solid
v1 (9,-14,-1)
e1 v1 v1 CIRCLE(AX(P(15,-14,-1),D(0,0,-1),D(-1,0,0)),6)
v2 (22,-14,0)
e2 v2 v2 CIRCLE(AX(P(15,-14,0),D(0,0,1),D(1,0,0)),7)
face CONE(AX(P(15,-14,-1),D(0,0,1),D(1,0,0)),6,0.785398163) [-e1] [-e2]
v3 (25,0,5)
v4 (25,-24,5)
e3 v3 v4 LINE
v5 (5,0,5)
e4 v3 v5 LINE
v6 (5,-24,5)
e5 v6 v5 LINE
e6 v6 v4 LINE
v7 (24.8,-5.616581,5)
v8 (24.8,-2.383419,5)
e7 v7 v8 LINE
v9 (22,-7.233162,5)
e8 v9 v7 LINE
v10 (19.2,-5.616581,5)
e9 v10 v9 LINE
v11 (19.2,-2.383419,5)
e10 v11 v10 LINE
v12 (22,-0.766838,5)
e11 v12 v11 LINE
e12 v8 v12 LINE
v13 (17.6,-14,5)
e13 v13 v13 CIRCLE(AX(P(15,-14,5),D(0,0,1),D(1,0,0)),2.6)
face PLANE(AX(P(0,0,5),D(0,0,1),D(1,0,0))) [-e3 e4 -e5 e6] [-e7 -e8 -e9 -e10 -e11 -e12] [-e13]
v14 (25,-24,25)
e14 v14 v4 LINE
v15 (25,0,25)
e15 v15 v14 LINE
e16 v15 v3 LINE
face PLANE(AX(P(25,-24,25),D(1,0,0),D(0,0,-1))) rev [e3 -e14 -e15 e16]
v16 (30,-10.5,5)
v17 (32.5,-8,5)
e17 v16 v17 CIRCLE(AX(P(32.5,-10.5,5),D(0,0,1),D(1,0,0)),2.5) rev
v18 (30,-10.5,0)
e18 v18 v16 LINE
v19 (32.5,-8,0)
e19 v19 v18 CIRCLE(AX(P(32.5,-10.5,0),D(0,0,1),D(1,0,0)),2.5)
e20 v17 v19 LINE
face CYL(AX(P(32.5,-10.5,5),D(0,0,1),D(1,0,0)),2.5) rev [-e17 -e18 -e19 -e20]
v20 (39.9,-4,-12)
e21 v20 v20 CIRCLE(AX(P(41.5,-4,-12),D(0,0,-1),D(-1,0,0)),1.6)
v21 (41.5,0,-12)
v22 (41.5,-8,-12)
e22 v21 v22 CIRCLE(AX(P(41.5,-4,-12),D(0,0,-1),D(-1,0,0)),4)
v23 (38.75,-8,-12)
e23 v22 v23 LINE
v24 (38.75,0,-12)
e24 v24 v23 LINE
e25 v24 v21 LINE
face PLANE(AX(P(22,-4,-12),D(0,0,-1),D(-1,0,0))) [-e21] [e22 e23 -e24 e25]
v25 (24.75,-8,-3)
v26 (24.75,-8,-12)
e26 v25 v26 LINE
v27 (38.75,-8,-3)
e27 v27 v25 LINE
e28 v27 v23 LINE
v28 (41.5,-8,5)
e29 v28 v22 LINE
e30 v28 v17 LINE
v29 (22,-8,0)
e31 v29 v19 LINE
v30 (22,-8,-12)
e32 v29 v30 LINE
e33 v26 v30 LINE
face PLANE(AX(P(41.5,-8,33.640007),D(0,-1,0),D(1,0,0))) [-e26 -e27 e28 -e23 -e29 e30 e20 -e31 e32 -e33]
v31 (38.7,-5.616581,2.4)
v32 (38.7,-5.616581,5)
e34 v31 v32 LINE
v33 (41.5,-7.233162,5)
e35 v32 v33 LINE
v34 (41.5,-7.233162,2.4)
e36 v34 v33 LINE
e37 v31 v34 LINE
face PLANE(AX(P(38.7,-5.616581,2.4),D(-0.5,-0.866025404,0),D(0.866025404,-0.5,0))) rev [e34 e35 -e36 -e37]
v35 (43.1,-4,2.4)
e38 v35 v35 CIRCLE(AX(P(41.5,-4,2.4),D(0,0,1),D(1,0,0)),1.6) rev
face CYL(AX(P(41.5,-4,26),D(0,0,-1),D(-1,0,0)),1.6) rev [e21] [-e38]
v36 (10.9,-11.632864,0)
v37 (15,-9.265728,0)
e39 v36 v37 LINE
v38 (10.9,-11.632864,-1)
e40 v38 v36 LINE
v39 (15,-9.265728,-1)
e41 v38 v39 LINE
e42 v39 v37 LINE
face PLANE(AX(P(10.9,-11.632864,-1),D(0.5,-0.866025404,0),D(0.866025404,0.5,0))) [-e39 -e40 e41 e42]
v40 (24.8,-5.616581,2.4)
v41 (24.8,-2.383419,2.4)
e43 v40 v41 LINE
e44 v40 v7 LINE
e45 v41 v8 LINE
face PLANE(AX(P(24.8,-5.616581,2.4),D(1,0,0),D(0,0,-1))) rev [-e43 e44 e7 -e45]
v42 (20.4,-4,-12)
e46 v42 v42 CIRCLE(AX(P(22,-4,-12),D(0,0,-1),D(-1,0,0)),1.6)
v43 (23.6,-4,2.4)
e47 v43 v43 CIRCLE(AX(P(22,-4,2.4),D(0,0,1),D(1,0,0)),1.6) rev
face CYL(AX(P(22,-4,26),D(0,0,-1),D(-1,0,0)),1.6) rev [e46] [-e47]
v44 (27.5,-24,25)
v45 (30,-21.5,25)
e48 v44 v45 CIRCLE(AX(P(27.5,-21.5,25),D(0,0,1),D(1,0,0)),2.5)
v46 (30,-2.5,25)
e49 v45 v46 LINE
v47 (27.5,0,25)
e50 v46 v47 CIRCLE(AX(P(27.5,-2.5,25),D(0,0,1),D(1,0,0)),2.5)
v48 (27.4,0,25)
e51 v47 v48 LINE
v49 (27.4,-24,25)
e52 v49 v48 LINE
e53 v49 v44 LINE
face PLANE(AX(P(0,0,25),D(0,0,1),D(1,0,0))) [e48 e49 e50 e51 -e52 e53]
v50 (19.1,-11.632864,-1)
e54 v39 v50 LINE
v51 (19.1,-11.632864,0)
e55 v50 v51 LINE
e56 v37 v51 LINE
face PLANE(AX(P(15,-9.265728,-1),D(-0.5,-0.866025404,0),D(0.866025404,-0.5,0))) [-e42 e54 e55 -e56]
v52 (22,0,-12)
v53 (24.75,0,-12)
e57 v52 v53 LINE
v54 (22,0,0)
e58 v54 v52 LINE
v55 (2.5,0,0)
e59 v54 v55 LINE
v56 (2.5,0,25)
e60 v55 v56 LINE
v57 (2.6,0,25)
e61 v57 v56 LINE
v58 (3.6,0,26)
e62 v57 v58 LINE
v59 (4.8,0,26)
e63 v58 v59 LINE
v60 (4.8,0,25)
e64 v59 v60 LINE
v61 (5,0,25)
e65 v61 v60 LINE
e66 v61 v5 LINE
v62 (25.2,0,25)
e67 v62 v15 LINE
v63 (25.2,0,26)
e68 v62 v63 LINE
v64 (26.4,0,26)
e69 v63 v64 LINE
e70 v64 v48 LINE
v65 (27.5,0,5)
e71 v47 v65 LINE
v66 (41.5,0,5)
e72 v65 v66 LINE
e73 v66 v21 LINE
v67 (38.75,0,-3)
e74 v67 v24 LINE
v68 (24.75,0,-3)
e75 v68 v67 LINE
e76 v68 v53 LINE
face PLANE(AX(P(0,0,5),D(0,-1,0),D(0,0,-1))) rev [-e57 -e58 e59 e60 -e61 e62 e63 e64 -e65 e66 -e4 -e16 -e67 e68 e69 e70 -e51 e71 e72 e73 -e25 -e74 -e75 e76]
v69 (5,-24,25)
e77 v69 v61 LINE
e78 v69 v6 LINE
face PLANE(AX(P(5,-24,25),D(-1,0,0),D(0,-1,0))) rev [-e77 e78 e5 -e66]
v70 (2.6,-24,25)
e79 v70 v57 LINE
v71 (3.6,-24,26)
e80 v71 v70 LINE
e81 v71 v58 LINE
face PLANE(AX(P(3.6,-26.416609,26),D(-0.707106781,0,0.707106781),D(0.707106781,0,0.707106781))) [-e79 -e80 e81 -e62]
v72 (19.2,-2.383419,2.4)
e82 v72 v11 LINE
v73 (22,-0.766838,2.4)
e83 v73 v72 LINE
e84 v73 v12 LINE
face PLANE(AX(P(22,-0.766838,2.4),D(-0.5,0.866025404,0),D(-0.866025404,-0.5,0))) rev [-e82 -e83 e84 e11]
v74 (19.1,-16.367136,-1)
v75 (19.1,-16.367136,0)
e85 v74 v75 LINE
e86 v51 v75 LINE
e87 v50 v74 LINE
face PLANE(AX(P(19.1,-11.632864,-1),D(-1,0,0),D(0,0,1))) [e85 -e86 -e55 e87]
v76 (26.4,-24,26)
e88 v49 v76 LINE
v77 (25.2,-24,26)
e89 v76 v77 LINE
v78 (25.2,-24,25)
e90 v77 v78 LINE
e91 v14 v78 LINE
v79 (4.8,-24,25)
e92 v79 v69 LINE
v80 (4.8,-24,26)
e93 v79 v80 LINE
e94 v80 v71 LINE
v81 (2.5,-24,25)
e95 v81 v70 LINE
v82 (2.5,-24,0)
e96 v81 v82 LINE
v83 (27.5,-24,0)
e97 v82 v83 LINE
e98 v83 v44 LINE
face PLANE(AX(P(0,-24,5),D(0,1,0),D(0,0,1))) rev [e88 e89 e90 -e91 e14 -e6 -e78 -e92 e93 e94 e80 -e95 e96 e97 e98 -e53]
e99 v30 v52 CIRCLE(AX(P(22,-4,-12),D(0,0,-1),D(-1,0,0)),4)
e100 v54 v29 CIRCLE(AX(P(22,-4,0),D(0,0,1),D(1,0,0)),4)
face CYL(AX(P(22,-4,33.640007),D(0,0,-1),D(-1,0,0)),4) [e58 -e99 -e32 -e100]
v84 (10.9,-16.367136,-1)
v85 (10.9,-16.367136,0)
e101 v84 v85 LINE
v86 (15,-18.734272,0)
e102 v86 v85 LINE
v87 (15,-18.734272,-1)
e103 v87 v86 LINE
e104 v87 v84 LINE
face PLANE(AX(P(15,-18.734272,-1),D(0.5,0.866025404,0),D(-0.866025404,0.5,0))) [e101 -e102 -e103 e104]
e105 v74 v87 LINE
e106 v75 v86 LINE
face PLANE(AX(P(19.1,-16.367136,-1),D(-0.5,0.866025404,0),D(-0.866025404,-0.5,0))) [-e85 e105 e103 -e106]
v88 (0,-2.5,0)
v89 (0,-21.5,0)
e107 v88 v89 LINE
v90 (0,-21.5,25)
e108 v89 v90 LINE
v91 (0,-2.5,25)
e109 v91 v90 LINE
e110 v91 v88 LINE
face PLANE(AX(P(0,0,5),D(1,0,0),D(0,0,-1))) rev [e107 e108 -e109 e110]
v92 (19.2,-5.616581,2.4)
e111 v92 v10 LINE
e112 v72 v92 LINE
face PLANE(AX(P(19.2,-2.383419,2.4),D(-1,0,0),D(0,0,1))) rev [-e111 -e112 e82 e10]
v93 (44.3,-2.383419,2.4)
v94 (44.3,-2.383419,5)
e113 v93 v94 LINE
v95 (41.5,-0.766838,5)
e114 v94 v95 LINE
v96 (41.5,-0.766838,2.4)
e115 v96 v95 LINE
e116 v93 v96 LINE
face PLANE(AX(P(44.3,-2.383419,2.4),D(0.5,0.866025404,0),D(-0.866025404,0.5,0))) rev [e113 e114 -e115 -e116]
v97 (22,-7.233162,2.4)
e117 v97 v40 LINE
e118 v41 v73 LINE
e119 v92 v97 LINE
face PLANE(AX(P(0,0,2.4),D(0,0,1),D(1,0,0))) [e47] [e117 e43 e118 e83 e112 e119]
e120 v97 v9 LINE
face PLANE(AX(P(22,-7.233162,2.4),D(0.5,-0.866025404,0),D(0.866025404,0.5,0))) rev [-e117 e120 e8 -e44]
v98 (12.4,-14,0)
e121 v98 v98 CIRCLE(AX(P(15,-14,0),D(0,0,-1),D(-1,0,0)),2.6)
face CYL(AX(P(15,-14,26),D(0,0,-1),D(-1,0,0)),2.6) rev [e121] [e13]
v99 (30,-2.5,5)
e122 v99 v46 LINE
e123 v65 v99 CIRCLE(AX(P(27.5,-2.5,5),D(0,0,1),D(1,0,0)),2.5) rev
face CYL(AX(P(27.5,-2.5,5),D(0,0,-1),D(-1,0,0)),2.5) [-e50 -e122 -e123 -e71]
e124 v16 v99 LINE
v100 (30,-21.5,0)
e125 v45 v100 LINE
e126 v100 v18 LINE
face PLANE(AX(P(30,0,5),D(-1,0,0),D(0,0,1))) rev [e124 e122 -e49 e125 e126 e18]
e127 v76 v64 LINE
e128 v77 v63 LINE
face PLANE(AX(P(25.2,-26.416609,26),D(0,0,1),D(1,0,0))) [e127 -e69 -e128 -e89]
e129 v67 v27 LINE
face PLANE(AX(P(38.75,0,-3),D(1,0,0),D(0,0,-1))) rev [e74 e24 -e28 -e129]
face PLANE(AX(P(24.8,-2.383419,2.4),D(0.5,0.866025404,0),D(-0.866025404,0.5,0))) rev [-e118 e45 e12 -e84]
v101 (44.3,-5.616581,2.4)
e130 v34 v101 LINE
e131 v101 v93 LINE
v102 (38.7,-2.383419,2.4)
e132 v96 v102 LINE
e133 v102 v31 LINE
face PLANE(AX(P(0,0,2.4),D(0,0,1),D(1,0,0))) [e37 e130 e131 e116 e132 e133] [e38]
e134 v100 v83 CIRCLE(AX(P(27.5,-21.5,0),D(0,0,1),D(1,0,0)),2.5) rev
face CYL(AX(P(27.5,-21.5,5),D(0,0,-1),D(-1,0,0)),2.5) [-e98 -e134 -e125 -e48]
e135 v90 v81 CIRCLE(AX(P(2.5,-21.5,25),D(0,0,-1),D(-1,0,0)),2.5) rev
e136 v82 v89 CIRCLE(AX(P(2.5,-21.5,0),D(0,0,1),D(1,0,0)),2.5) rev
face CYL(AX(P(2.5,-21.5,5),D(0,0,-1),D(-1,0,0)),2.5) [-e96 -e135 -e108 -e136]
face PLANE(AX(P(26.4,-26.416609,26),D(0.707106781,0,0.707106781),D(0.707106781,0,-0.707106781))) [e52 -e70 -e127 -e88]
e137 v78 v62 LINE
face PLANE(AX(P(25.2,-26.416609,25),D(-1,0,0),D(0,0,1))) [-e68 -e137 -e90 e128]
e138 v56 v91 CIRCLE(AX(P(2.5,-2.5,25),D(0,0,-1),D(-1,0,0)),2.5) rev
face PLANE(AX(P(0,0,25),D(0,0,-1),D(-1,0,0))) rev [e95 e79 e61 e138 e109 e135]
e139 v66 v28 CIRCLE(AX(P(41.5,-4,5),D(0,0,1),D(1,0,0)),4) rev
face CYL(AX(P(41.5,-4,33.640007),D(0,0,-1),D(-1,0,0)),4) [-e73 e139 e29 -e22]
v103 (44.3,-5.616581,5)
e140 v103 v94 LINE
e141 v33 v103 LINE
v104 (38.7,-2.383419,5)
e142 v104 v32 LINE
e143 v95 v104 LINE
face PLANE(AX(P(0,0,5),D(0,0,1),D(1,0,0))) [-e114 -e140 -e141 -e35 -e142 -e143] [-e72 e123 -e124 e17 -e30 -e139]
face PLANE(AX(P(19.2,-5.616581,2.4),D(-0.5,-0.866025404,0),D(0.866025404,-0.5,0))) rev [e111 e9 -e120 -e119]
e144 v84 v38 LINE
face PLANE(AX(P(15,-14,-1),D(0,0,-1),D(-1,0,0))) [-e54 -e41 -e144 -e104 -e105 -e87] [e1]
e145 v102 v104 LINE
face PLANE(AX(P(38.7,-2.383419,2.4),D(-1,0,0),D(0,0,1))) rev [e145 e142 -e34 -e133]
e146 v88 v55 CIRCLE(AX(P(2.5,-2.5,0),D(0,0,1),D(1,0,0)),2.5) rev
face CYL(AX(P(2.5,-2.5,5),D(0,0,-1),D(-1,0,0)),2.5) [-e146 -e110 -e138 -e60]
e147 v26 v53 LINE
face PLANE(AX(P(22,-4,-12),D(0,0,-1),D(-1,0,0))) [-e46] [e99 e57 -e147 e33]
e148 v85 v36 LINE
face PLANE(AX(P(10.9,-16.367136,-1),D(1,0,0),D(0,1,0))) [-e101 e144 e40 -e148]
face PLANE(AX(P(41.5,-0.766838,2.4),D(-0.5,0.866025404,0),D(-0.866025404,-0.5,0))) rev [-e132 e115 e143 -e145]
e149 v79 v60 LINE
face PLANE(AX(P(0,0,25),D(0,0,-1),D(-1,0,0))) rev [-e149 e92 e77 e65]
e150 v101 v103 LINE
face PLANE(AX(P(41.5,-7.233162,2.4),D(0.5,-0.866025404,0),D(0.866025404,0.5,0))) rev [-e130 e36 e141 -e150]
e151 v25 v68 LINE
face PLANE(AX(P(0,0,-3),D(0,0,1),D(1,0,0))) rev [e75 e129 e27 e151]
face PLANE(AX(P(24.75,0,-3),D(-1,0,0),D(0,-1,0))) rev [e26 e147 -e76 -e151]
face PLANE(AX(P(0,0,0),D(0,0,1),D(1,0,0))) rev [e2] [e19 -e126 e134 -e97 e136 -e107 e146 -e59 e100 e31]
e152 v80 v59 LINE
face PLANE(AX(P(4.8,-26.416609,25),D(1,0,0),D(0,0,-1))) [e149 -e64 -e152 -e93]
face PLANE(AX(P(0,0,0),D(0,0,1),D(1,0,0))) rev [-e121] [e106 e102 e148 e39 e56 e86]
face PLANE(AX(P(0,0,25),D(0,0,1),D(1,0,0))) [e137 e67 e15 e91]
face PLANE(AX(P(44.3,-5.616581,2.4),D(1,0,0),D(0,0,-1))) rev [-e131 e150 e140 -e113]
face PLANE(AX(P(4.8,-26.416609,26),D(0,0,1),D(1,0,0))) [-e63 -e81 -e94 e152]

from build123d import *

# Parameters (mm, degrees)
SKETCH_1_W                  = 30
SKETCH_1_H                  = 24
EXTRUDE_1_DEPTH             = 5
SKETCH_2_W                  = 5
SKETCH_2_H                  = 24
EXTRUDE_2_DEPTH             = 20
EXTRUDE_3_DEPTH             = 24
SKETCH_4_R                  = 2.6
CUT_EXTRUDE_1_DEPTH         = 47.389654019
EXTRUDE_4_DEPTH             = 12
EXTRUDE_4_DIRECTION_2_REACH = 48.39
SKETCH_6_W                  = 14
SKETCH_6_H                  = 8
CUT_EXTRUDE_2_DEPTH         = 9
SKETCH_7_R                  = 1.6
CUT_EXTRUDE_3_DEPTH         = 64.955062348
CUT_EXTRUDE_4_DEPTH         = 2.6
SKETCH_10_R                 = 6
EXTRUDE_5_DEPTH             = 1
FILLET_1_R                  = 2.5
FILLET_2_R                  = 2.5
CHAMFER_1_SIZE              = 1


with BuildPart() as part:
    # Эскиз1 → Бобышка-Вытянуть1 (new body)
    with BuildSketch(Plane.XY):
        with Locations((15, -12)):
            Rectangle(SKETCH_1_W, SKETCH_1_H)
    extrude(amount=EXTRUDE_1_DEPTH)

    # Эскиз2 → Бобышка-Вытянуть2 (add)
    with BuildSketch(Plane.XY.offset(5)):
        with Locations((2.5, -12)):
            Rectangle(SKETCH_2_W, SKETCH_2_H)
        with Locations((27.5, -12)):
            Rectangle(SKETCH_2_W, SKETCH_2_H)
    extrude(amount=EXTRUDE_2_DEPTH)

    # Эскиз3 → Бобышка-Вытянуть3 (add)
    with BuildSketch(Plane(origin=(0, 0, 0), x_dir=(1, 0, 0), z_dir=(0, 1, 0))):
        Polygon((25.2, -25), (25.2, -26), (26.4, -26), (27.4, -25), align=None)
        Polygon((4.8, -25), (4.8, -26), (3.6, -26), (2.6, -25), align=None)
    extrude(amount=-EXTRUDE_3_DEPTH)

    # Эскиз4 → Вырез-Вытянуть1 (cut, through all)
    with BuildSketch(Plane(origin=(0, 0, 0), x_dir=(-1, 0, 0), z_dir=(0, 0, -1))):
        with Locations((-15, -14)):
            Circle(SKETCH_4_R)
    extrude(amount=-CUT_EXTRUDE_1_DEPTH, mode=Mode.SUBTRACT)

    # Эскиз5 → Бобышка-Вытянуть4 (add)
    with BuildSketch(Plane(origin=(0, 0, 0), x_dir=(-1, 0, 0), z_dir=(0, 0, -1))):
        with BuildLine():
            Line((-22, 0), (-41.5, 0))
            ThreePointArc((-41.5, 0), (-45.5, -4), (-41.5, -8))
            Line((-41.5, -8), (-22, -8))
            ThreePointArc((-22, -8), (-18, -4), (-22, 0))
        make_face()
    extrude(amount=EXTRUDE_4_DEPTH)

    # Бобышка-Вытянуть4 direction 2: up to this face of the body (flat: up to its plane)
    extrude_4_direction_2_end = Plane(part.part.faces().sort_by_distance((5.312409987, -12, 5))[0])
    # Эскиз5 → Бобышка-Вытянуть4 direction 2 (add, up to the picked face)
    with BuildSketch(Plane(origin=(0, 0, 0), x_dir=(-1, 0, 0), z_dir=(0, 0, -1)), mode=Mode.PRIVATE) as extrude_4_direction_2_sk1:
        with BuildLine():
            Line((-22, 0), (-41.5, 0))
            ThreePointArc((-41.5, 0), (-45.5, -4), (-41.5, -8))
            Line((-41.5, -8), (-22, -8))
            ThreePointArc((-22, -8), (-18, -4), (-22, 0))
        make_face()
    extrude_4_direction_2_tool1 = split(extrude(extrude_4_direction_2_sk1.sketch, amount=-EXTRUDE_4_DIRECTION_2_REACH, mode=Mode.PRIVATE), bisect_by=extrude_4_direction_2_end, keep=Keep.BOTH, mode=Mode.PRIVATE)
    add(extrude_4_direction_2_tool1.solids().sort_by(Axis((31.75, -4, 0), (0, 0, 1)))[0])

    # Эскиз6 → Вырез-Вытянуть2 (cut)
    with BuildSketch(Plane(origin=(0, 0, -12), x_dir=(-1, 0, 0), z_dir=(0, 0, -1))):
        with Locations((-31.75, -4)):
            Rectangle(SKETCH_6_W, SKETCH_6_H)
    extrude(amount=-CUT_EXTRUDE_2_DEPTH, mode=Mode.SUBTRACT)

    # Эскиз7 → Вырез-Вытянуть3 (cut, through all)
    with BuildSketch(Plane(origin=(0, 0, -12), x_dir=(-1, 0, 0), z_dir=(0, 0, -1))):
        with Locations((-22, -4)):
            Circle(SKETCH_7_R)
        with Locations((-41.5, -4)):
            Circle(SKETCH_7_R)
    extrude(amount=-CUT_EXTRUDE_3_DEPTH, mode=Mode.SUBTRACT)

    # Эскиз8 → Вырез-Вытянуть4 (cut)
    with BuildSketch(Plane.XY.offset(5)):
        Polygon((41.5, -0.766838493), (38.7, -2.383419246), (38.7, -5.616580754), (41.5, -7.233161507), (44.3, -5.616580754), (44.3, -2.383419246), align=None)
        Polygon((22, -0.766838493), (19.2, -2.383419246), (19.2, -5.616580754), (22, -7.233161507), (24.8, -5.616580754), (24.8, -2.383419246), align=None)
    extrude(amount=-CUT_EXTRUDE_4_DEPTH, mode=Mode.SUBTRACT)

    # Эскиз10 → Бобышка-Вытянуть5 (add)
    with BuildSketch(Plane(origin=(0, 0, 0), x_dir=(-1, 0, 0), z_dir=(0, 0, -1))):
        with Locations(Location((-15, -14, 0), (0, 0, 180))):
            Circle(SKETCH_10_R)
        Polygon((-15, -18.734272207), (-10.9, -16.367136104), (-10.9, -11.632863896), (-15, -9.265727793), (-19.1, -11.632863896), (-19.1, -16.367136104), align=None, mode=Mode.SUBTRACT)
    extrude(amount=EXTRUDE_5_DEPTH)

    # Скругление1
    fillet_1_edges = [part.edges().sort_by_distance(p)[0] for p in [
        (0, 0, 12.5),
        (30, 0, 15),
        (30, -24, 12.5),
        (0, -24, 12.5),
    ]]
    fillet(fillet_1_edges, radius=FILLET_1_R)

    # Скругление2
    fillet_2_edges = [part.edges().sort_by_distance(p)[0] for p in [
        (30, -8, 2.5),
    ]]
    fillet(fillet_2_edges, radius=FILLET_2_R)

    # Фаска1
    chamfer_1_edges = [part.edges().sort_by_distance(p)[0] for p in [
        (9, -14, 0),
    ]]
    chamfer(chamfer_1_edges, length=CHAMFER_1_SIZE - 0.0001)  # a hair under: the kernel refuses the full size


solid = part.part
